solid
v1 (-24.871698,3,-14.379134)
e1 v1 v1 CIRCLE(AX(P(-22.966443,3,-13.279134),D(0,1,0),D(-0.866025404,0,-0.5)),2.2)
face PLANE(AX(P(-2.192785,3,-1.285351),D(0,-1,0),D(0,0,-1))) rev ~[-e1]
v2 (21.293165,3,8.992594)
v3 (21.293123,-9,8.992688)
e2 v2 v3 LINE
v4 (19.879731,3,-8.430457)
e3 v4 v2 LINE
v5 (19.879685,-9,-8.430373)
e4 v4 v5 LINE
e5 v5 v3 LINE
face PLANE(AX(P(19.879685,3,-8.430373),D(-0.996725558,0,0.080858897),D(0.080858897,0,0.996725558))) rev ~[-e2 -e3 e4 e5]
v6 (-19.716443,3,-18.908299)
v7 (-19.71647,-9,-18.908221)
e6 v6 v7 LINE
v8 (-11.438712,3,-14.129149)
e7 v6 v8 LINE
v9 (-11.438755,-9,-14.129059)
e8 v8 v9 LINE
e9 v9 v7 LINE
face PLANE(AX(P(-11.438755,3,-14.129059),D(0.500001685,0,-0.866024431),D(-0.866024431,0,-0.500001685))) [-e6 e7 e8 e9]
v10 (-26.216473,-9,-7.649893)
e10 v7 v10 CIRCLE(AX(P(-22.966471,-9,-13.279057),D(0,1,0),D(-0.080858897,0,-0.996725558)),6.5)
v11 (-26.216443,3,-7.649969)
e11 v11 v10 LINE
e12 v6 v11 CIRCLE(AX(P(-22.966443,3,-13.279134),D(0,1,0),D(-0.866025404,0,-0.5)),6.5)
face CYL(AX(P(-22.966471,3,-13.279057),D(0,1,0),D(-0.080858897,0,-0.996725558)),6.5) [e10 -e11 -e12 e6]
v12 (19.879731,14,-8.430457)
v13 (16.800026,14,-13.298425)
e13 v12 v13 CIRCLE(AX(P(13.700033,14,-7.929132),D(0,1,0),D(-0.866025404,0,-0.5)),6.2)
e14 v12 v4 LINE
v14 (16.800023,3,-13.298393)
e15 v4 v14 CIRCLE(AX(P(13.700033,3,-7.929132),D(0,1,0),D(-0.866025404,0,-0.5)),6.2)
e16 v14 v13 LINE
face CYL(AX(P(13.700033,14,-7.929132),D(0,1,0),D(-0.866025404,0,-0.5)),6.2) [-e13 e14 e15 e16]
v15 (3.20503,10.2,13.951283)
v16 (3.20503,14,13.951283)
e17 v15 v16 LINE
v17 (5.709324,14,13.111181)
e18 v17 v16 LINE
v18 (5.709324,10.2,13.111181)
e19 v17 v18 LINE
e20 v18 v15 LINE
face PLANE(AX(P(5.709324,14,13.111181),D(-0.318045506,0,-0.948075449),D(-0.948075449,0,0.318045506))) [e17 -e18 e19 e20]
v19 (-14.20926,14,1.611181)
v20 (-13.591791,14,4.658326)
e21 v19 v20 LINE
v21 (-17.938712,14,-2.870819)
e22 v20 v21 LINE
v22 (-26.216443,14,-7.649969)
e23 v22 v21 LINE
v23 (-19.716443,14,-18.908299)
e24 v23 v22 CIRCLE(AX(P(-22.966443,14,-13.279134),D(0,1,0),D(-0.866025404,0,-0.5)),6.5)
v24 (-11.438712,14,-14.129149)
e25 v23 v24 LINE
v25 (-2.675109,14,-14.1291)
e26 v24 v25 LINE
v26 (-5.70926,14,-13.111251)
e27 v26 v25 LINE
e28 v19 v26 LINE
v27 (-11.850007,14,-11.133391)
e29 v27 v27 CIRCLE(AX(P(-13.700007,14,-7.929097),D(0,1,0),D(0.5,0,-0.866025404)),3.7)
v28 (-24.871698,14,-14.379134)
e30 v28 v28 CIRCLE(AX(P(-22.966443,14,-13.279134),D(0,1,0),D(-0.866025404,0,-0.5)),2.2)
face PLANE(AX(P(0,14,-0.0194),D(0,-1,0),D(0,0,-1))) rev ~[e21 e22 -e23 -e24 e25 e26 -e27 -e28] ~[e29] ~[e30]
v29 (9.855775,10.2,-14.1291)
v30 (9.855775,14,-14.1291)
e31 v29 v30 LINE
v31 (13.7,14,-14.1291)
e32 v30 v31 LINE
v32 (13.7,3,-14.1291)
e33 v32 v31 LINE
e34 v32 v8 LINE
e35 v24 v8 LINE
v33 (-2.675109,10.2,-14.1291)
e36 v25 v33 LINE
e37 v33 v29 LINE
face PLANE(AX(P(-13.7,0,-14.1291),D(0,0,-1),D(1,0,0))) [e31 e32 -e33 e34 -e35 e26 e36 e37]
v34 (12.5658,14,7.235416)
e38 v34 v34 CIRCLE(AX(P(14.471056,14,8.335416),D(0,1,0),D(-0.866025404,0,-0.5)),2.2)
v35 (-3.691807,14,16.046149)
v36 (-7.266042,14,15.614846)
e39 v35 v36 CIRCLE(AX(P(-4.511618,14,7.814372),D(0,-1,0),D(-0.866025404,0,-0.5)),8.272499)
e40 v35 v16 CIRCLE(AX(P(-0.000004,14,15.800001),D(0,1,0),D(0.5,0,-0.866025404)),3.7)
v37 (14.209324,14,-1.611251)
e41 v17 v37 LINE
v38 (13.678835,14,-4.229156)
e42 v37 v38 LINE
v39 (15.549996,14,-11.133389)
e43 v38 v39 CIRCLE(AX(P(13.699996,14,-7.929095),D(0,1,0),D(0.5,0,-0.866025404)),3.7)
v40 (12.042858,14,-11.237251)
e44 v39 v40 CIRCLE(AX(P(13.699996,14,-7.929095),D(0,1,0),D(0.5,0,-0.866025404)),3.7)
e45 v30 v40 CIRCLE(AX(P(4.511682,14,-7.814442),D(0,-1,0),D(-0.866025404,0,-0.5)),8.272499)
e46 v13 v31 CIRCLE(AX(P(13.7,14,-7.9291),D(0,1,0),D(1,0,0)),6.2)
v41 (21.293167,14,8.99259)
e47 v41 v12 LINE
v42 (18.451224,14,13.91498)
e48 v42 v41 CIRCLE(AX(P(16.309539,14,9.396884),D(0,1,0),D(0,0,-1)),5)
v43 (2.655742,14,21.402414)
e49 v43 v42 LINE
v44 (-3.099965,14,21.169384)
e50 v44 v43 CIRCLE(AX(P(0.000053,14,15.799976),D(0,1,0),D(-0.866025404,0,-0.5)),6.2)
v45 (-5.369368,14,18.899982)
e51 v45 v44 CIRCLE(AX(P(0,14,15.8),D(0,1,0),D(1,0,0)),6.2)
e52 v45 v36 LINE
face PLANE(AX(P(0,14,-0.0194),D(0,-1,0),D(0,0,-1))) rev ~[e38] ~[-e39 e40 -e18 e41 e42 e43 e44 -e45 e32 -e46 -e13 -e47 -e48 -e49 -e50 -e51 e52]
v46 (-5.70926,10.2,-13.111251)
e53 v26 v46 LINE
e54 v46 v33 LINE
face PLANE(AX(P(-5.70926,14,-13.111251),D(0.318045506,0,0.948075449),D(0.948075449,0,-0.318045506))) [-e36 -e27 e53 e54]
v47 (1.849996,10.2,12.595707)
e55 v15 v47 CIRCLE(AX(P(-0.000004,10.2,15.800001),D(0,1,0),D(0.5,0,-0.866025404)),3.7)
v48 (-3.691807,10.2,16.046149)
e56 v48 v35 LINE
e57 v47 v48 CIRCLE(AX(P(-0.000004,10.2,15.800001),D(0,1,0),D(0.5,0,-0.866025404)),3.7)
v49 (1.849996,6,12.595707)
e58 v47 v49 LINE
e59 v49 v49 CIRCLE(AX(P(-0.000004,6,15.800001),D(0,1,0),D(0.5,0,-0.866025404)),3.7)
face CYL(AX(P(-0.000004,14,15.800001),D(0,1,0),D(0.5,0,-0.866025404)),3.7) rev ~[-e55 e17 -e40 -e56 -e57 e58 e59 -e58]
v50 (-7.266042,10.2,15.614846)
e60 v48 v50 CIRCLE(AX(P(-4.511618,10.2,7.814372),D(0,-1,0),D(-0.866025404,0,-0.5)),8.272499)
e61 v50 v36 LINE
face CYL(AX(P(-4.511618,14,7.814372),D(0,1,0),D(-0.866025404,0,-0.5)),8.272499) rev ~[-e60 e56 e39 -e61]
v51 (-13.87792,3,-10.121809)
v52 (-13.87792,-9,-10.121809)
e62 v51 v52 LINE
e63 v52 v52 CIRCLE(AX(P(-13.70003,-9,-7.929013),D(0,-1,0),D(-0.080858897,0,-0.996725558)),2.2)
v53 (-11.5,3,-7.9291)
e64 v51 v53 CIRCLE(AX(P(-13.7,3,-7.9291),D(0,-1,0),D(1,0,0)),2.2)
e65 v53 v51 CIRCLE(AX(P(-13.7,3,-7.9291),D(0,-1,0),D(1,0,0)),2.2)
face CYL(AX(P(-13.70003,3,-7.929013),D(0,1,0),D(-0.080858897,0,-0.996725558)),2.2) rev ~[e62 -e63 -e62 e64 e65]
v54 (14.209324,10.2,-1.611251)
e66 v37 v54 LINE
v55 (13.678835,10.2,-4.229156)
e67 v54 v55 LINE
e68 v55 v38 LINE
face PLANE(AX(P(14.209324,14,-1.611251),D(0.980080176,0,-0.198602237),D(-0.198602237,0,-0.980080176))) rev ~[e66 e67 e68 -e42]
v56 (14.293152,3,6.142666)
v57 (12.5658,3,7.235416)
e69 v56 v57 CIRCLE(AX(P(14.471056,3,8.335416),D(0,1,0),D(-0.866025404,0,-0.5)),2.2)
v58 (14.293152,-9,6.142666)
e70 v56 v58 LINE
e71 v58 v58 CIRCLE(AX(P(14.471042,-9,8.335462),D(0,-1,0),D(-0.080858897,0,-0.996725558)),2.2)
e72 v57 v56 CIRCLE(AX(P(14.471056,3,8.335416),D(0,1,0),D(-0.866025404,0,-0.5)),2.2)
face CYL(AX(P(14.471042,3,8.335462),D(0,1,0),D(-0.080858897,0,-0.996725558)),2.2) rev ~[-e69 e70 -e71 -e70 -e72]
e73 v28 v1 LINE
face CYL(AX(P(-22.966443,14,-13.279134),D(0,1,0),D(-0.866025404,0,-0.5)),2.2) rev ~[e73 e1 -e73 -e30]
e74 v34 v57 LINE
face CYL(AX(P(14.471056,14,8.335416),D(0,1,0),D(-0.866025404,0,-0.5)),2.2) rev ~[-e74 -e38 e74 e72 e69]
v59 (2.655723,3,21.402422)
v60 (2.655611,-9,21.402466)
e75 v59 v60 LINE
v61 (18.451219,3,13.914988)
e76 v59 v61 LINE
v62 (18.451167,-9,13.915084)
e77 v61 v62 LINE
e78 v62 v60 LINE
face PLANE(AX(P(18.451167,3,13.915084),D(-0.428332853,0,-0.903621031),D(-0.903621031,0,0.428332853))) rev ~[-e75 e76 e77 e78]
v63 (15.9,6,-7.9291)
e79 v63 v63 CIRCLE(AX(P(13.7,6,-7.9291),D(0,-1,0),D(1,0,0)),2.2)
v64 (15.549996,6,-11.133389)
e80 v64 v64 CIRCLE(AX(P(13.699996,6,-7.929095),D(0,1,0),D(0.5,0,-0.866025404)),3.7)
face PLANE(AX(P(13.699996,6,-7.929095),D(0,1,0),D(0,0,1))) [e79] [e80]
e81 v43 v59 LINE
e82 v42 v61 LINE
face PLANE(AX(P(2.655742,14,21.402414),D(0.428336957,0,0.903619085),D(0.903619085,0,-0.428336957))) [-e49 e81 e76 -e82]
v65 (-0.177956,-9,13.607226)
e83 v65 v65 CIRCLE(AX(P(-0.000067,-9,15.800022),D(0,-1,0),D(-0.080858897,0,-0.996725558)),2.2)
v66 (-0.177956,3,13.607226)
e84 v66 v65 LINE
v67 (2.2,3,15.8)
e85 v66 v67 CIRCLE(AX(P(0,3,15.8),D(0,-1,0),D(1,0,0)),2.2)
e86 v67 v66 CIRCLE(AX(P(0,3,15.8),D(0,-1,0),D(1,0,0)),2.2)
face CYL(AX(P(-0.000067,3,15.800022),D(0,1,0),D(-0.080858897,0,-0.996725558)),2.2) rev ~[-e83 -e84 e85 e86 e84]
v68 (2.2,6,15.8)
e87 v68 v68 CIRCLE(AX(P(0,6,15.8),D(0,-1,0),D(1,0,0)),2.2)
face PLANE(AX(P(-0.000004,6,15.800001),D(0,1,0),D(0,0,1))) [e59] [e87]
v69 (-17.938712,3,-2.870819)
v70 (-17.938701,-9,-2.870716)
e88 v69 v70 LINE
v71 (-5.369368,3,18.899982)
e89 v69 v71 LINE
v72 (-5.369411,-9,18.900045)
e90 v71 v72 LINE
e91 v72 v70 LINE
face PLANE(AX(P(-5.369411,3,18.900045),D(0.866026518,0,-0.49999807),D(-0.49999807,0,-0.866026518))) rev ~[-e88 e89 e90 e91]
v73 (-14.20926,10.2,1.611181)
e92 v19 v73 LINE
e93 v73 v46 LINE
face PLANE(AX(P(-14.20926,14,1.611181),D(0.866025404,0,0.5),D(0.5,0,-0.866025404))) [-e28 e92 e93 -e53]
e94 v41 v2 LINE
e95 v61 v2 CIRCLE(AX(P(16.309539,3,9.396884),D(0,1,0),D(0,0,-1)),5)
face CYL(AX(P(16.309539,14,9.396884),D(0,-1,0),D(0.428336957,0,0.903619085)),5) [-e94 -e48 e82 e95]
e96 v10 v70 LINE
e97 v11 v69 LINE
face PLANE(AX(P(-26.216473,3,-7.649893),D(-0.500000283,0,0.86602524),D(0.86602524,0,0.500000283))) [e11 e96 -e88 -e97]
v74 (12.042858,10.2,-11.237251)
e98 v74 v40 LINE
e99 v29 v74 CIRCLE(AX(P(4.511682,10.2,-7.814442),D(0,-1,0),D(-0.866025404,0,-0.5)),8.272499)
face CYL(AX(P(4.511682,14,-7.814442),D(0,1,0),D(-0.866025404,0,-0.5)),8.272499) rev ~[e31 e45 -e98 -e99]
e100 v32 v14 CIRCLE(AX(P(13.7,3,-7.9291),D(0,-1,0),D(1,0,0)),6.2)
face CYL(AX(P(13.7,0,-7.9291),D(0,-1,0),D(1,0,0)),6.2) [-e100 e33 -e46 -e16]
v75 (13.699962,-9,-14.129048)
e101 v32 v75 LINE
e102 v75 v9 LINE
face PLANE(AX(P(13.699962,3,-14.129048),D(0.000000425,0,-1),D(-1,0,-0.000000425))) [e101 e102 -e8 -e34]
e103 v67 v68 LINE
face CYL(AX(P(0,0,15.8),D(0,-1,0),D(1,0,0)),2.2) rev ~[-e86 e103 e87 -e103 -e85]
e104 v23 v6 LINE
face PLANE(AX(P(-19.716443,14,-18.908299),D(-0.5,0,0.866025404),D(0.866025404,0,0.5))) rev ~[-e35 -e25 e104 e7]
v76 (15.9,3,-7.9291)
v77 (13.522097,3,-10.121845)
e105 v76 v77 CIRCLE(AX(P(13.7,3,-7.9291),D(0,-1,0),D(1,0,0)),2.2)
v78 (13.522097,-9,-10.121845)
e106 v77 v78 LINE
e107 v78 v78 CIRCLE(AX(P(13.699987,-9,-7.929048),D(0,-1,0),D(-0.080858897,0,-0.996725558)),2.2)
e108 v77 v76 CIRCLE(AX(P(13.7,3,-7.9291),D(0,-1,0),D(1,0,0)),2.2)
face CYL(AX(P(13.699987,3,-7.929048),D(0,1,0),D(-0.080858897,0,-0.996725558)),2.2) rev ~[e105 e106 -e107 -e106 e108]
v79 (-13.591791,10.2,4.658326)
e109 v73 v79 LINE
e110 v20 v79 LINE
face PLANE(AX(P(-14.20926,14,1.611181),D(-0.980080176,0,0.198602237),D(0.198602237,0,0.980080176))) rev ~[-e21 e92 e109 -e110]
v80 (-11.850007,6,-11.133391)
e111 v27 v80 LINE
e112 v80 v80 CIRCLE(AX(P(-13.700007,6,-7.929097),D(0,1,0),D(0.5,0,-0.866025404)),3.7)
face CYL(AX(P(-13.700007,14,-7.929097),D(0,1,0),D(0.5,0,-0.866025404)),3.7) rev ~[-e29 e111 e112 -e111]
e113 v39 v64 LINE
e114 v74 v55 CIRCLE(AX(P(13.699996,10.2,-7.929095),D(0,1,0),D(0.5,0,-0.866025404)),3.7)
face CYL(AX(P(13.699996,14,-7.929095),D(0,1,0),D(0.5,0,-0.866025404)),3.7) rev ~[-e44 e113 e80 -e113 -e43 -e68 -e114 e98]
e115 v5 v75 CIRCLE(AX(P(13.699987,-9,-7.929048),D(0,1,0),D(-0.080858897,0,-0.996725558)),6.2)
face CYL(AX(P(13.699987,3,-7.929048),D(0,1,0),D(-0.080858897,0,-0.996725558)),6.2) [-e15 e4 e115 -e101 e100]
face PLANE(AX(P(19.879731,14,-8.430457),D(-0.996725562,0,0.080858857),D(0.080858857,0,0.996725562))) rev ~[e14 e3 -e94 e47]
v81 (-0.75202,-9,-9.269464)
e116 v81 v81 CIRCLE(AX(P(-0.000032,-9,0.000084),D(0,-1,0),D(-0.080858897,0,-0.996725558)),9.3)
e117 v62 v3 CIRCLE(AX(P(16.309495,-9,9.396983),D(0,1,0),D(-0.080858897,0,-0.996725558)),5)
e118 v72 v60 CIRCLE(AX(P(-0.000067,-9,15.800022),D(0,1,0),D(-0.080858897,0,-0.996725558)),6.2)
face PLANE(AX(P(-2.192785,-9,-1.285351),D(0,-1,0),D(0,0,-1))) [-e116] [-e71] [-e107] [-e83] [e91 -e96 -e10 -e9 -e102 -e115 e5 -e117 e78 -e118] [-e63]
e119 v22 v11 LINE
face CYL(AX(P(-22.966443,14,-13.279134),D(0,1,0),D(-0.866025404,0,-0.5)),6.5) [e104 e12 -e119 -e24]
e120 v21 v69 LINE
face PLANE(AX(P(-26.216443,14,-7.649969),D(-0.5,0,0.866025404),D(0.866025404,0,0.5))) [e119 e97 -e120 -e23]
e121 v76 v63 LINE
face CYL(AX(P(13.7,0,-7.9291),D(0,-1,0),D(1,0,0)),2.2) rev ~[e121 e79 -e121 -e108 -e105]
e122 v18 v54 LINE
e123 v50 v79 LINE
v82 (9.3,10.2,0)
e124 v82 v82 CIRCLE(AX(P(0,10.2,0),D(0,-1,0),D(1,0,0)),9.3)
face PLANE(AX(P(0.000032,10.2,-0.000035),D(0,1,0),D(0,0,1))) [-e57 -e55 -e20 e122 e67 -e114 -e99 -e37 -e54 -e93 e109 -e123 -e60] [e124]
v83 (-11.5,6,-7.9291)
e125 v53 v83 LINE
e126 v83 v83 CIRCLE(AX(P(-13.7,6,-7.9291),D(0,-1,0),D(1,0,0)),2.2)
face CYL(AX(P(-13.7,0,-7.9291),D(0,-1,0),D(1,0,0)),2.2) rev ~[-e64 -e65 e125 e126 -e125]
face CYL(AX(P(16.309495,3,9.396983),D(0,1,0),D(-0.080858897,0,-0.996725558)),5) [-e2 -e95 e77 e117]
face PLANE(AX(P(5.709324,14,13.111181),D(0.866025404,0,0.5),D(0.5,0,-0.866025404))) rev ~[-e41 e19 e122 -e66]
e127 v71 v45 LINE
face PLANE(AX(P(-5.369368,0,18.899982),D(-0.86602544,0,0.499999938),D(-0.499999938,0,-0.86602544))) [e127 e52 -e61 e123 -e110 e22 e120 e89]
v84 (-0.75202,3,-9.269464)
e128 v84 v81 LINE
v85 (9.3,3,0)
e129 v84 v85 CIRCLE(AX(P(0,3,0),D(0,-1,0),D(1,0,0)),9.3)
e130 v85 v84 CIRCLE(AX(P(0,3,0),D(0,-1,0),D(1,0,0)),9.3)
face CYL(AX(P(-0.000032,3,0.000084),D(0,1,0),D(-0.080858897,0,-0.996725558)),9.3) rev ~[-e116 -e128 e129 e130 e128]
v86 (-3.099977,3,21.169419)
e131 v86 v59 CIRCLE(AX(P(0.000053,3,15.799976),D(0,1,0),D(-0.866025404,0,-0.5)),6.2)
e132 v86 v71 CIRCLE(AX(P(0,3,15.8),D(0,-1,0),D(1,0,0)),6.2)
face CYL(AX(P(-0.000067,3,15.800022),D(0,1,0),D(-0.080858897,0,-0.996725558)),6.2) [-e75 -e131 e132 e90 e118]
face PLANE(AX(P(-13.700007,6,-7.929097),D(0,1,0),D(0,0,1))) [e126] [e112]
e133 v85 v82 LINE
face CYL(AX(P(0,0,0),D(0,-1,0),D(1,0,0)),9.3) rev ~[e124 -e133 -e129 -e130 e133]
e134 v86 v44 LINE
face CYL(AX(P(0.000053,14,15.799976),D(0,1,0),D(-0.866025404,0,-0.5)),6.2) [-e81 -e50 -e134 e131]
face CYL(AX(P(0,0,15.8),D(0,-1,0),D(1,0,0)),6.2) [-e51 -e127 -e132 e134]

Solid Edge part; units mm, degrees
sketch "Sketch1" plane through (0, 0, 0) normal (0, -1, 0) x (1, 0, 0)
  line L0 (-5.3694, 18.9) -> (-19.0694, -4.8291)
  arc A0 (-13.7, -14.1291) -> (-19.0694, -4.8291) centre (-13.7, -7.9291) cw
  line L1 (-13.7, -14.1291) -> (13.7, -14.1291)
  arc A1 (19.0694, -4.8291) -> (13.7, -14.1291) centre (13.7, -7.9291) cw
  line L2 (5.3694, 18.9) -> (19.0694, -4.8291)
  arc A2 (-5.3694, 18.9) -> (5.3694, 18.9) centre (0, 15.8) cw
  dimension "D1" = 5.3694
extrude "Protrusion1" add sketch "Sketch1" against normal blind 14
sketch "Sketch2" plane through (0, 0, 0) normal (0, -1, 0) x (1, 0, 0)
  circle A0 centre (-13.7, -7.9291) radius 2.2
  circle A1 centre (13.7, -7.9291) radius 2.2
  circle A2 centre (0, 15.8) radius 2.2
  dimension "D1" = 37.2
  dimension "D2" = 4
  dimension "D3" = 4.4
  dimension "D4" = 6.2
  dimension "D5" = 6.2
  dimension "D6" = 4.4
  dimension "D7" = 6.2
  dimension "D8" = 27.4
  dimension "D9" = 27.4
  dimension "D10" = 27.4
extrude "Cutout1" cut sketch "Sketch2" against normal blind 457.8755
sketch "Sketch3" plane through (0, 0, 0) normal (0, -1, 0) x (1, 0, 0)
  circle A0 centre (0, 0) radius 9.3
extrude "Cutout2" cut sketch "Sketch3" against normal blind 434.4917
sketch "Sketch4" plane through (0, 0, 3.9355) normal (0, -1, 0) x (-0.5, 0, 0.8660254)
  line L0 (-23.325, -5.9323) -> (-23.325, -18.9323)
  line L1 (-23.325, -18.9323) -> (16.475, -18.9323)
  line L2 (16.475, -18.9323) -> (16.475, -5.9323)
  line L3 (12.7755, -8.7037) -> (16.475, -5.9323)
  line L4 (-20.9306, -8.7037) -> (12.7755, -8.7037)
  line L5 (-20.9306, -5.9323) -> (-20.9306, -8.7037)
  line L6 (-23.325, -5.9323) -> (-20.9306, -5.9323)
  dimension "D1" = 13
extrude "Protrusion2" add sketch "Sketch4" against normal up to vertex (14 mm away)
sketch "Sketch5" plane through (18.1083, 8, 10.4355) normal (0.8660254, 0, 0.5) x (-0.5, 0, 0.8660254)
  line L0 (-19.9, 8) -> (19.9, 8)
  line L1 (19.9, -6) -> (19.9, 8)
  line L2 (-19.9, -6) -> (19.9, -6)
  line L3 (-19.9, -6) -> (-19.9, 8)
extrude "ExtrudedProtrusion_14" add sketch "Sketch5" along normal blind 4
sketch "Sketch6" plane through (5.8112, 14, 7.7701) normal (0, 1, 0) x (0.5, 0, -0.8660254)
  circle A0 centre (3.8403, 24.7468) radius 3.7
  circle A1 centre (17.5403, 1.0177) radius 3.7
  circle A2 centre (-9.8597, 1.0177) radius 3.7
extrude "Cutout3" cut sketch "Sketch6" against normal blind 8
sketch "Sketch7" plane through (11.8615, 14, 7.7701) normal (0, 1, 0) x (-0.8660254, 0, -0.5)
  circle A0 centre (-2.5426, -0.8152) radius 2.2
  dimension "D1" = 6
  dimension "D2" = 39.8
  dimension "D3" = 19.9
  dimension "D4" = 4.4
extrude "ExtrudedCutout_23" cut sketch "Sketch7" against normal blind 166.5817
sketch "Sketch8" plane through (11.8615, 14, 7.7701) normal (0, 1, 0) x (-0.8660254, 0, -0.5)
  circle A0 centre (40.6865, -0.8152) radius 2.2
  line L0 (40.6865, 5.6848) -> (31.1282, 5.6848)
  line L1 (31.1282, 5.6848) -> (31.1282, 3.8832)
  line L2 (31.1282, 3.8832) -> (34.2429, 1.8592)
  line L3 (34.2429, 1.8592) -> (34.2429, -2.6486)
  line L4 (31.1282, -7.3152) -> (34.2429, -2.6486)
  line L5 (40.6865, -7.3152) -> (31.1282, -7.3152)
  arc A1 (40.6865, -7.3152) -> (40.6865, 5.6848) centre (40.6865, -0.8152) ccw
extrude "Protrusion3" add sketch "Sketch8" against normal up to vertex (14 mm away)
sketch "Sketch9" plane through (11.8615, 14, 7.7701) normal (0, 1, 0) x (-0.8660254, 0, -0.5)
  line L0 (-10.7426, -0.8152) -> (-10.7426, -20.7152)
  line L1 (-10.7426, -20.7152) -> (6.2574, -20.7152)
  arc A0 (1.1563, -18.0392) -> (6.2574, -20.7152) centre (6.2574, -14.5152) ccw
  line L2 (1.1563, -18.0392) -> (-10.7426, -0.8152)
extrude "Cutout4" cut sketch "Sketch9" against normal blind 85.4791
sketch "Sketch10" plane through (6.8865, 14, 7.7701) normal (0, 1, 0) x (-0.8660254, 0, -0.5)
  line L0 (-15.0511, 16.5973) -> (-15.0511, -3.3027)
  line L1 (-3.1522, 13.9213) -> (-15.0511, -3.3027)
  arc A0 (1.9489, 16.5973) -> (-3.1522, 13.9213) centre (1.9489, 10.3973) ccw
  line L2 (1.9489, 16.5973) -> (-15.0511, 16.5973)
extrude "ExtrudedCutout_27" cut sketch "Sketch10" against normal blind 118.3722
sketch "Sketch11" plane through (0, 0, 0) normal (0, 0, 1) x (1, 0, 0)
  line L0 (-57, 0) -> (32.4619, 0)
  line L1 (32.4619, 0) -> (32.4619, 3)
  line L2 (32.4619, 3) -> (-57, 3)
  line L3 (-57, 3) -> (-57, 0)
  dimension "D1" = 3
extrude "Cutout5" cut sketch "Sketch11" along normal mid plane 82.8276
sketch "Sketch12" plane through (11.8615, 14, 7.7701) normal (0, 1, 0) x (-0.8660254, 0, -0.5)
  line L0 (2.6574, 7.7016) -> (2.6574, -9.2984)
  line L1 (2.6574, -9.2984) -> (7.9574, -15.2984)
  arc A0 (20.3574, -15.2984) -> (7.9574, -15.2984) centre (14.1574, -9.8217) cw
  line L2 (25.6574, -9.2984) -> (20.3574, -15.2984)
  line L3 (25.6574, 7.7016) -> (25.6574, -9.2984)
  line L4 (25.6574, 7.7016) -> (20.3574, 13.7016)
  arc A1 (7.9574, 13.7016) -> (20.3574, 13.7016) centre (14.1574, 8.2249) cw
  line L5 (2.6574, 7.7016) -> (7.9574, 13.7016)
  dimension "D1" = 11.5
  dimension "D2" = 11.5
  dimension "D3" = 6.2
  dimension "D4" = 6.2
  dimension "D5" = 8.5
  dimension "D6" = 8.5
  dimension "D7" = 8.5
  dimension "D8" = 8.5
  dimension "D9" = 6
  dimension "D10" = 6
  dimension "D11" = 6
  dimension "D12" = 6
extrude "Cutout6" cut sketch "Sketch12" against normal blind 3.8
fillet "Round_2" radius 5 1 edges at (21.5724, 8.5, 12.4355)
sketch "Sketch13" plane through (-4.0785, 3, 1.1105) normal (0, -1, 0) x (-0.0808589, 0, -0.9967256)
  line L0 (-14.5843, 21.4205) -> (-20.7701, 5.0713)
  arc A0 (-17.6269, -2.7251) -> (-20.7701, 5.0713) centre (-14.9712, 2.8773) cw
  line L1 (-17.6269, -2.7251) -> (5.0889, -13.4929)
  line L2 (10.5218, -21.3571) -> (5.0889, -13.4929)
  arc A1 (21.2176, -13.9681) -> (10.5218, -21.3571) centre (15.8697, -17.6626) cw
  line L3 (15.7848, -6.1039) -> (21.2176, -13.9681)
  line L4 (13.7521, 18.9525) -> (15.7848, -6.1039)
  arc A2 (7.5724, 24.6512) -> (13.7521, 18.9525) centre (7.5724, 18.4512) cw
  line L5 (7.5724, 24.6512) -> (-9.9079, 24.6512)
  arc A3 (-14.5843, 21.4205) -> (-9.9079, 24.6512) centre (-9.9079, 19.6512) cw
  circle A4 centre (7.5724, 18.4512) radius 2.2
  circle A5 centre (-8.7012, 17.9046) radius 2.2
  circle A6 centre (-14.9712, 2.8773) radius 2.2
  circle A7 centre (0.777, 4.1549) radius 9.3
  circle A8 centre (9.7879, -8.8591) radius 2.2
extrude "ExtrudedProtrusion_16" add sketch "Sketch13" along normal blind 12
